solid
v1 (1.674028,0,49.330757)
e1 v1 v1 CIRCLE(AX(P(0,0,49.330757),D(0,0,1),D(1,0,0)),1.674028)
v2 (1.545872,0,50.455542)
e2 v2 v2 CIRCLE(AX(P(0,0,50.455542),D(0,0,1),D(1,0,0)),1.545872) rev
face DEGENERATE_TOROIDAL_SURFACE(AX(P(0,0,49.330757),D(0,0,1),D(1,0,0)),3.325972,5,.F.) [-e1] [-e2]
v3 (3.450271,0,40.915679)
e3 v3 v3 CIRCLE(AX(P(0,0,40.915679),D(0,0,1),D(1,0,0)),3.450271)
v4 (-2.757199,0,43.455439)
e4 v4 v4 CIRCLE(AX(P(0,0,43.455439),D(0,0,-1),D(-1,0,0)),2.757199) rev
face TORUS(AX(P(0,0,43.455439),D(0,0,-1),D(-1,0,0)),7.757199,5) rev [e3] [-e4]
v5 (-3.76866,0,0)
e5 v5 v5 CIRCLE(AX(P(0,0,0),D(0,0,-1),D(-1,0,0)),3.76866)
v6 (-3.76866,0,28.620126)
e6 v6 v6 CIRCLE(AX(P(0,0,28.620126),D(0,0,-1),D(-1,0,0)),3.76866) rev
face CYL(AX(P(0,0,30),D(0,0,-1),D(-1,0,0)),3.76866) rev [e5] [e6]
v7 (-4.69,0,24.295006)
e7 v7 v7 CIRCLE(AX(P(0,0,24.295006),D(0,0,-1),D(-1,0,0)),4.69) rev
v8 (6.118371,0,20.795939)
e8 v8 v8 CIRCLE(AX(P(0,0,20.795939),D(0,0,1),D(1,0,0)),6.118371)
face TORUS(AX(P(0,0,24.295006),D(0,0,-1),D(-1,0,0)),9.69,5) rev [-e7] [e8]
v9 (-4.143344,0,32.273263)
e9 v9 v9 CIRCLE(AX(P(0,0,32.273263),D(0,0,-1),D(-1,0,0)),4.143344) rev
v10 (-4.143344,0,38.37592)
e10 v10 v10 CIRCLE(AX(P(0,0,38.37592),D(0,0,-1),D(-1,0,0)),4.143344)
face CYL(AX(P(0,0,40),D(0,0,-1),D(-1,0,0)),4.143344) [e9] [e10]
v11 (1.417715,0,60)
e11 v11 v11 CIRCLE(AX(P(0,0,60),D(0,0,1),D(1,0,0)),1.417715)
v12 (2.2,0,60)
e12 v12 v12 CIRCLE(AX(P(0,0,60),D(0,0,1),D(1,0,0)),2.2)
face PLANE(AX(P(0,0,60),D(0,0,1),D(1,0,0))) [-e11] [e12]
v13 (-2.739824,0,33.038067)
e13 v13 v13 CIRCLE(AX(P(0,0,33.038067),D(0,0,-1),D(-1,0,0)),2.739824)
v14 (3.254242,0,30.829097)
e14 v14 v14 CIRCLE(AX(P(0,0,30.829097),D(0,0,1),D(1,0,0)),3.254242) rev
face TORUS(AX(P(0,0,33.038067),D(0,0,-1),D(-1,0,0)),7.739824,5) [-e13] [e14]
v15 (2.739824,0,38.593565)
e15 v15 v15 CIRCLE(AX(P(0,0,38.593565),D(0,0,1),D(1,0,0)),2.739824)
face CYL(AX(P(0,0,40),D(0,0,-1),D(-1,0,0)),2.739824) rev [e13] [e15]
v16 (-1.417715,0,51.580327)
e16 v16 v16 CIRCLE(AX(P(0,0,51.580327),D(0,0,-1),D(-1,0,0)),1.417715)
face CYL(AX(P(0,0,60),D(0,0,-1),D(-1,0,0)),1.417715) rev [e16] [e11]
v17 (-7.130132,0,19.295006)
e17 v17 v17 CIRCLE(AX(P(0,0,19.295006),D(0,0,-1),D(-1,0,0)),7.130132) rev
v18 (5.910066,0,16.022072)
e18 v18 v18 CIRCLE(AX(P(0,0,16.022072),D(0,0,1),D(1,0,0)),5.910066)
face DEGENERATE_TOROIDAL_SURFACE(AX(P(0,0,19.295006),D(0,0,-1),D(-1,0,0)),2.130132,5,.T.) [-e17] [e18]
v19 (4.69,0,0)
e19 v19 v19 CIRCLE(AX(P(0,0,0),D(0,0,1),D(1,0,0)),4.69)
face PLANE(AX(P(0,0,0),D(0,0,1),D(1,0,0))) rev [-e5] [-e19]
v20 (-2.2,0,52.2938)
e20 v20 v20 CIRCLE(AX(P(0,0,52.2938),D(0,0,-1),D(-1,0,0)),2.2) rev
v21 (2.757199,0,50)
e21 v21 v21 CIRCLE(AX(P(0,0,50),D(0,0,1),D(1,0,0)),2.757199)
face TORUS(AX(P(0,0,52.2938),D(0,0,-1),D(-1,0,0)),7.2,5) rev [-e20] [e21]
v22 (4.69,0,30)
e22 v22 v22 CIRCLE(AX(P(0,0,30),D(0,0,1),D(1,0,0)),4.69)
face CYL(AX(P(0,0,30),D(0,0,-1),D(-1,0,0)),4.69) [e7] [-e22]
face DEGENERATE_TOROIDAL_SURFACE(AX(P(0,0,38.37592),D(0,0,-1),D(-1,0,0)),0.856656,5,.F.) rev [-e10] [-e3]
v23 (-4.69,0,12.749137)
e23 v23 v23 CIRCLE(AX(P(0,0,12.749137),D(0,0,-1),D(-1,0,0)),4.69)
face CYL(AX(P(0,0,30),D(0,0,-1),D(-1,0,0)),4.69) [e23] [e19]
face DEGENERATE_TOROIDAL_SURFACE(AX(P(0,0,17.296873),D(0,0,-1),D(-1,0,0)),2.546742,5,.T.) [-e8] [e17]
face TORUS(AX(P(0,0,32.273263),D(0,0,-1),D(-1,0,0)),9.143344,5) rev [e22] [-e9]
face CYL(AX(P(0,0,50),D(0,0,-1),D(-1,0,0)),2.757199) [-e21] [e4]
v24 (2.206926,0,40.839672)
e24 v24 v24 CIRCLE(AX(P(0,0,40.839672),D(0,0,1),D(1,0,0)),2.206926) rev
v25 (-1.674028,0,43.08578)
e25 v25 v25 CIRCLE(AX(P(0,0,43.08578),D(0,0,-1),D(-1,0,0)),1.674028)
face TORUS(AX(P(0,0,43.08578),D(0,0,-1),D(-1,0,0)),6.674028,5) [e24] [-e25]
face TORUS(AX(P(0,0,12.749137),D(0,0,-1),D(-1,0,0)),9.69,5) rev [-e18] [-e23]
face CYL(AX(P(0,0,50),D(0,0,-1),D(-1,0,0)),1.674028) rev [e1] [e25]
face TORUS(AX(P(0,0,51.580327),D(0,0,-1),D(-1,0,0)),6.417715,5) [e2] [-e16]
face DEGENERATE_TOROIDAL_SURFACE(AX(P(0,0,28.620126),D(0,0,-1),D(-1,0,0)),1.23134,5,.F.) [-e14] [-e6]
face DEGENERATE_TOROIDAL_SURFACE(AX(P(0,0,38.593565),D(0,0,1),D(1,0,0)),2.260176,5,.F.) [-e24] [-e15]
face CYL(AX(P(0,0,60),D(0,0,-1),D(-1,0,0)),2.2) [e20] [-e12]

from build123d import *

# Parameters (mm, degrees)
SKETCH1_R           = 4.69
SKETCH1_R_2         = 2.2
BOSS_EXTRUDE3_DEPTH = 30
SKETCH3_R           = 4.14334423
SKETCH3_R_2         = 2.739824148
BOSS_EXTRUDE4_DEPTH = 10
SKETCH4_R           = 2.757198723
SKETCH4_R_2         = 1.67402832
BOSS_EXTRUDE5_DEPTH = 10
SKETCH5_R           = 2.2
SKETCH5_R_2         = 1.417715224
BOSS_EXTRUDE6_DEPTH = 10
FILLET13_R          = 5
FILLET15_R          = 5
FILLET16_R          = 5
FILLET17_R          = 5
FILLET19_R          = 5
FILLET20_R          = 5
FILLET21_R          = 5
BOSS_EXTRUDE7_START = -20
SKETCH6_R           = 7.130132291
BOSS_EXTRUDE7_DEPTH = 5
SKETCH7_R           = 3.768659845
CUT_EXTRUDE1_DEPTH  = 30
FILLET26_R          = 5
FILLET27_R          = 5
FILLET28_R          = 5
FILLET29_R          = 5
FILLET30_R          = 5


with BuildPart() as part:
    # Sketch1 → Boss-Extrude3 (new body)
    with BuildSketch(Plane.XY):
        Circle(SKETCH1_R)
        Circle(SKETCH1_R_2, mode=Mode.SUBTRACT)
    extrude(amount=BOSS_EXTRUDE3_DEPTH)

    # Sketch3 → Boss-Extrude4 (add)
    with BuildSketch(Plane.XY.offset(30)):
        Circle(SKETCH3_R)
        Circle(SKETCH3_R_2, mode=Mode.SUBTRACT)
    extrude(amount=BOSS_EXTRUDE4_DEPTH)

    # Sketch4 → Boss-Extrude5 (add)
    with BuildSketch(Plane.XY.offset(40)):
        Circle(SKETCH4_R)
        Circle(SKETCH4_R_2, mode=Mode.SUBTRACT)
    extrude(amount=BOSS_EXTRUDE5_DEPTH)

    # Sketch5 → Boss-Extrude6 (add)
    with BuildSketch(Plane.XY.offset(50)):
        Circle(SKETCH5_R)
        Circle(SKETCH5_R_2, mode=Mode.SUBTRACT)
    extrude(amount=BOSS_EXTRUDE6_DEPTH)

    # Fillet13
    # the kernel refuses this fillet: 5 mm, written as the material it takes off along each edge
    with BuildSketch(Plane(origin=(0, 0, 50), x_dir=(1, 0, 0), z_dir=(0, -1, 0))) as fillet13_piece_1:
        with BuildLine():
            CenterArc((6.417715224, 1.580327356), FILLET13_R, 180, 18.425147301)
            Line((1.417715224, 1.580327356), (1.317715224, 1.580327356))
            Line((1.317715224, 1.580327356), (1.317715224, 0))
            Line((1.317715224, 0), (1.417715224, -0.1))
            ThreePointArc((1.417715224, -0.1), (1.545871772, -0.1), (1.579154581, -0.031606547))
            Line((1.579154581, -0.031606547), (1.67402832, 0))
        make_face()
    revolve(axis=Axis((0, 0, 50), (0, 0, 1)), mode=Mode.SUBTRACT)

    # Fillet15
    fillet15_edges = [part.edges().sort_by_distance(p)[0] for p in [
        (-1.67402832, 0, 50),
    ]]
    fillet(fillet15_edges, radius=FILLET15_R)

    # Fillet16
    # the kernel refuses this fillet: 5 mm, written as the material it adds along each edge
    with BuildSketch(Plane(origin=(0, 0, 50), x_dir=(1, 0, 0), z_dir=(0, -1, 0))) as fillet16_piece_1:
        with BuildLine():
            CenterArc((7.2, 2.293799646), FILLET16_R, 180, 27.307116904)
            Line((2.757198723, 0), (2.668342698, -0.045875993))
            ThreePointArc((2.668342698, -0.045875993), (2.478599362, -0.1), (2.2, -0.1))
            Line((2.2, -0.1), (2.1, 0))
            Line((2.1, 0), (2.1, 2.293799646))
            Line((2.1, 2.293799646), (2.2, 2.293799646))
        make_face()
    revolve(axis=Axis((0, 0, 50), (0, 0, 1)))

    # Fillet17
    # the kernel refuses this fillet: 5 mm, written as the material it takes off along each edge
    with BuildSketch(Plane(origin=(0, 0, 40), x_dir=(1, 0, 0), z_dir=(0, -1, 0))) as fillet17_piece_1:
        with BuildLine():
            CenterArc((6.67402832, 3.085779891), FILLET17_R, 180, 38.108745083)
            Line((2.739824148, 0), (2.661140065, -0.061715598))
            ThreePointArc((2.661140065, -0.061715598), (2.206926234, -0.1), (1.67402832, -0.1))
            Line((1.67402832, -0.1), (1.57402832, 0))
            Line((1.57402832, 0), (1.57402832, 3.085779891))
            Line((1.57402832, 3.085779891), (1.67402832, 3.085779891))
        make_face()
    revolve(axis=Axis((0, 0, 40), (0, 0, 1)), mode=Mode.SUBTRACT)

    # Fillet18: read off the stored shape, not the designer's step
    # Fillet18 outline → Fillet18 (revolve)
    with BuildSketch(Plane.XZ):
        with BuildLine():
            Line((2.757198723, 40), (4.14334423, 40))
            ThreePointArc((4.14334423, 40), (3.116656057, 41.593889814), (2.757198723, 43.455438569))
            Line((2.757198723, 43.455438569), (2.757198723, 40))
        make_face()
    revolve(axis=Axis((0, 0, 0), (0, 0, 1)))

    # Fillet19
    fillet19_edges = [part.edges().sort_by_distance(p)[0] for p in [
        (-2.739824148, 0, 40),
    ]]
    fillet(fillet19_edges, radius=FILLET19_R)

    # Fillet20
    fillet20_edges = [part.edges().sort_by_distance(p)[0] for p in [
        (-4.14334423, 0, 40),
    ]]
    fillet(fillet20_edges, radius=FILLET20_R)

    # Fillet21
    # the kernel refuses this fillet: 5 mm, written as the material it adds along each edge
    with BuildSketch(Plane(origin=(0, 0, 30), x_dir=(1, 0, 0), z_dir=(0, -1, 0))) as fillet21_piece_1:
        with BuildLine():
            CenterArc((9.14334423, 2.27326311), FILLET21_R, 180, 27.042585546)
            Line((4.69, 0), (4.600933115, -0.045465262))
            ThreePointArc((4.600933115, -0.045465262), (4.416672115, -0.1), (4.14334423, -0.1))
            Line((4.14334423, -0.1), (4.04334423, 0))
            Line((4.04334423, 0), (4.04334423, 2.27326311))
            Line((4.04334423, 2.27326311), (4.14334423, 2.27326311))
        make_face()
    revolve(axis=Axis((0, 0, 30), (0, 0, 1)))

    # Sketch6 → Boss-Extrude7 (add)
    with BuildSketch(Plane(origin=(0, 0, 0), x_dir=(-1, 0, 0), z_dir=(0, 0, -1)).offset(BOSS_EXTRUDE7_START)):
        Circle(SKETCH6_R)
    extrude(amount=BOSS_EXTRUDE7_DEPTH)

    # Sketch7 → Cut-Extrude1 (cut)
    with BuildSketch(Plane(origin=(0, 0, 0), x_dir=(-1, 0, 0), z_dir=(0, 0, -1))):
        Circle(SKETCH7_R)
    extrude(amount=-CUT_EXTRUDE1_DEPTH, mode=Mode.SUBTRACT)

    # Fillet26
    # the kernel refuses this fillet: 5 mm, written as the material it adds along each edge
    with BuildSketch(Plane(origin=(0, 0, 20), x_dir=(1, 0, 0), z_dir=(0, 1, 0))) as fillet26_piece_1:
        with BuildLine():
            CenterArc((9.69, -4.29500609), FILLET26_R, 120.795376003, 59.204623997)
            Line((7.130132291, 0), (7.078934937, 0.085900122))
            ThreePointArc((7.078934937, 0.085900122), (5.910066146, 0.1), (4.69, 0.1))
            Line((4.69, 0.1), (4.59, 0))
            Line((4.59, 0), (4.59, -4.29500609))
            Line((4.59, -4.29500609), (4.69, -4.29500609))
        make_face()
    revolve(axis=Axis((0, 0, 20), (0, 0, -1)))

    # Fillet27
    # the kernel refuses this fillet: 5 mm, written as the material it takes off along each edge
    with BuildSketch(Plane(origin=(0, 0, 15), x_dir=(-1, 0, 0), z_dir=(0, -1, 0))) as fillet27_piece_1_section:
        with BuildLine():
            CenterArc((2.130132291, -4.29500609), FILLET27_R, 0, 59.204623997)
            Line((4.69, 0), (4.741197354, 0.085900122))
            ThreePointArc((4.741197354, 0.085900122), (5.910066146, 0.1), (7.130132291, 0.1))
            Line((7.130132291, 0.1), (7.230132291, 0))
            Line((7.230132291, 0), (7.230132291, -4.29500609))
            Line((7.230132291, -4.29500609), (7.130132291, -4.29500609))
        make_face()
    fillet27_piece_1 = revolve(axis=Axis((0, 0, 15), (0, 0, -1)), mode=Mode.PRIVATE)
    fillet27_piece_1 = fillet27_piece_1 - Plane(origin=(0, 0, 15), x_dir=(1, 0, 0), z_dir=(0, 0, -1)) * Cylinder(4.69, 29, mode=Mode.PRIVATE)
    add(fillet27_piece_1, mode=Mode.SUBTRACT)

    # Fillet28
    # the kernel refuses this fillet: 5 mm, written as the material it adds along each edge
    with BuildSketch(Plane(origin=(0, 0, 15), x_dir=(-1, 0, 0), z_dir=(0, -1, 0))) as fillet28_piece_1:
        with BuildLine():
            CenterArc((9.69, 2.250862854), FILLET28_R, 180, 40.888333518)
            Line((4.69, 2.250862854), (4.69, 0))
            ThreePointArc((4.69, 0), (5.340962178, -0.462177965), (5.910066146, -1.022071618))
        make_face()
    revolve(axis=Axis((0, 0, 15), (0, 0, -1)), revolution_arc=180)
    with BuildSketch(Plane(origin=(0, 0, 15), x_dir=(1, 0, 0), z_dir=(0, 1, 0))) as fillet28_piece_2:
        with BuildLine():
            CenterArc((9.69, 2.250862854), FILLET28_R, 180, 40.888333518)
            Line((4.69, 2.250862854), (4.69, 0))
            ThreePointArc((4.69, 0), (5.340962178, -0.462177965), (5.910066146, -1.022071618))
        make_face()
    revolve(axis=Axis((0, 0, 15), (0, 0, -1)), revolution_arc=180)
    # the kernel refuses this fillet: 5 mm, written as the material it takes off along each edge
    with BuildSketch(Plane(origin=(0, 0, 20), x_dir=(-1, 0, 0), z_dir=(0, -1, 0))) as fillet28_2_piece_1:
        with BuildLine():
            CenterArc((2.546742384, 2.703127277), FILLET28_R, 315.587970102, 20.857187789)
            Line((7.130132291, 0.70499391), (7.130132291, 0))
            ThreePointArc((7.130132291, 0), (6.598529109, -0.365272291), (6.118371192, -0.795939407))
        make_face()
    revolve(axis=Axis((0, 0, 20), (0, 0, -1)), revolution_arc=180, mode=Mode.SUBTRACT)
    with BuildSketch(Plane(origin=(0, 0, 20), x_dir=(1, 0, 0), z_dir=(0, 1, 0))) as fillet28_2_piece_2:
        with BuildLine():
            CenterArc((2.546742384, 2.703127277), FILLET28_R, 315.587970102, 20.857187789)
            Line((7.130132291, 0.70499391), (7.130132291, 0))
            ThreePointArc((7.130132291, 0), (6.598529109, -0.365272291), (6.118371192, -0.795939407))
        make_face()
    revolve(axis=Axis((0, 0, 20), (0, 0, -1)), revolution_arc=180, mode=Mode.SUBTRACT)

    # Fillet29
    # the kernel refuses this fillet: 5 mm, written as the material it takes off along each edge
    with BuildSketch(Plane(origin=(0, 0, 30), x_dir=(1, 0, 0), z_dir=(0, -1, 0))) as fillet29_piece_1:
        with BuildLine():
            CenterArc((7.739824148, 3.038067491), FILLET29_R, 180, 37.417142661)
            Line((2.739824148, 3.038067491), (2.639824148, 3.038067491))
            Line((2.639824148, 3.038067491), (2.639824148, 0))
            Line((2.639824148, 0), (2.739824148, -0.1))
            ThreePointArc((2.739824148, -0.1), (3.254241996, -0.1), (3.689236559, -0.06076135))
            Line((3.689236559, -0.06076135), (3.768659845, 0))
        make_face()
    revolve(axis=Axis((0, 0, 30), (0, 0, 1)), mode=Mode.SUBTRACT)

    # Fillet30
    fillet30_edges = [part.edges().sort_by_distance(p)[0] for p in [
        (0, -3.768659845, 30),
    ]]
    fillet(fillet30_edges, radius=FILLET30_R)


solid = part.part
